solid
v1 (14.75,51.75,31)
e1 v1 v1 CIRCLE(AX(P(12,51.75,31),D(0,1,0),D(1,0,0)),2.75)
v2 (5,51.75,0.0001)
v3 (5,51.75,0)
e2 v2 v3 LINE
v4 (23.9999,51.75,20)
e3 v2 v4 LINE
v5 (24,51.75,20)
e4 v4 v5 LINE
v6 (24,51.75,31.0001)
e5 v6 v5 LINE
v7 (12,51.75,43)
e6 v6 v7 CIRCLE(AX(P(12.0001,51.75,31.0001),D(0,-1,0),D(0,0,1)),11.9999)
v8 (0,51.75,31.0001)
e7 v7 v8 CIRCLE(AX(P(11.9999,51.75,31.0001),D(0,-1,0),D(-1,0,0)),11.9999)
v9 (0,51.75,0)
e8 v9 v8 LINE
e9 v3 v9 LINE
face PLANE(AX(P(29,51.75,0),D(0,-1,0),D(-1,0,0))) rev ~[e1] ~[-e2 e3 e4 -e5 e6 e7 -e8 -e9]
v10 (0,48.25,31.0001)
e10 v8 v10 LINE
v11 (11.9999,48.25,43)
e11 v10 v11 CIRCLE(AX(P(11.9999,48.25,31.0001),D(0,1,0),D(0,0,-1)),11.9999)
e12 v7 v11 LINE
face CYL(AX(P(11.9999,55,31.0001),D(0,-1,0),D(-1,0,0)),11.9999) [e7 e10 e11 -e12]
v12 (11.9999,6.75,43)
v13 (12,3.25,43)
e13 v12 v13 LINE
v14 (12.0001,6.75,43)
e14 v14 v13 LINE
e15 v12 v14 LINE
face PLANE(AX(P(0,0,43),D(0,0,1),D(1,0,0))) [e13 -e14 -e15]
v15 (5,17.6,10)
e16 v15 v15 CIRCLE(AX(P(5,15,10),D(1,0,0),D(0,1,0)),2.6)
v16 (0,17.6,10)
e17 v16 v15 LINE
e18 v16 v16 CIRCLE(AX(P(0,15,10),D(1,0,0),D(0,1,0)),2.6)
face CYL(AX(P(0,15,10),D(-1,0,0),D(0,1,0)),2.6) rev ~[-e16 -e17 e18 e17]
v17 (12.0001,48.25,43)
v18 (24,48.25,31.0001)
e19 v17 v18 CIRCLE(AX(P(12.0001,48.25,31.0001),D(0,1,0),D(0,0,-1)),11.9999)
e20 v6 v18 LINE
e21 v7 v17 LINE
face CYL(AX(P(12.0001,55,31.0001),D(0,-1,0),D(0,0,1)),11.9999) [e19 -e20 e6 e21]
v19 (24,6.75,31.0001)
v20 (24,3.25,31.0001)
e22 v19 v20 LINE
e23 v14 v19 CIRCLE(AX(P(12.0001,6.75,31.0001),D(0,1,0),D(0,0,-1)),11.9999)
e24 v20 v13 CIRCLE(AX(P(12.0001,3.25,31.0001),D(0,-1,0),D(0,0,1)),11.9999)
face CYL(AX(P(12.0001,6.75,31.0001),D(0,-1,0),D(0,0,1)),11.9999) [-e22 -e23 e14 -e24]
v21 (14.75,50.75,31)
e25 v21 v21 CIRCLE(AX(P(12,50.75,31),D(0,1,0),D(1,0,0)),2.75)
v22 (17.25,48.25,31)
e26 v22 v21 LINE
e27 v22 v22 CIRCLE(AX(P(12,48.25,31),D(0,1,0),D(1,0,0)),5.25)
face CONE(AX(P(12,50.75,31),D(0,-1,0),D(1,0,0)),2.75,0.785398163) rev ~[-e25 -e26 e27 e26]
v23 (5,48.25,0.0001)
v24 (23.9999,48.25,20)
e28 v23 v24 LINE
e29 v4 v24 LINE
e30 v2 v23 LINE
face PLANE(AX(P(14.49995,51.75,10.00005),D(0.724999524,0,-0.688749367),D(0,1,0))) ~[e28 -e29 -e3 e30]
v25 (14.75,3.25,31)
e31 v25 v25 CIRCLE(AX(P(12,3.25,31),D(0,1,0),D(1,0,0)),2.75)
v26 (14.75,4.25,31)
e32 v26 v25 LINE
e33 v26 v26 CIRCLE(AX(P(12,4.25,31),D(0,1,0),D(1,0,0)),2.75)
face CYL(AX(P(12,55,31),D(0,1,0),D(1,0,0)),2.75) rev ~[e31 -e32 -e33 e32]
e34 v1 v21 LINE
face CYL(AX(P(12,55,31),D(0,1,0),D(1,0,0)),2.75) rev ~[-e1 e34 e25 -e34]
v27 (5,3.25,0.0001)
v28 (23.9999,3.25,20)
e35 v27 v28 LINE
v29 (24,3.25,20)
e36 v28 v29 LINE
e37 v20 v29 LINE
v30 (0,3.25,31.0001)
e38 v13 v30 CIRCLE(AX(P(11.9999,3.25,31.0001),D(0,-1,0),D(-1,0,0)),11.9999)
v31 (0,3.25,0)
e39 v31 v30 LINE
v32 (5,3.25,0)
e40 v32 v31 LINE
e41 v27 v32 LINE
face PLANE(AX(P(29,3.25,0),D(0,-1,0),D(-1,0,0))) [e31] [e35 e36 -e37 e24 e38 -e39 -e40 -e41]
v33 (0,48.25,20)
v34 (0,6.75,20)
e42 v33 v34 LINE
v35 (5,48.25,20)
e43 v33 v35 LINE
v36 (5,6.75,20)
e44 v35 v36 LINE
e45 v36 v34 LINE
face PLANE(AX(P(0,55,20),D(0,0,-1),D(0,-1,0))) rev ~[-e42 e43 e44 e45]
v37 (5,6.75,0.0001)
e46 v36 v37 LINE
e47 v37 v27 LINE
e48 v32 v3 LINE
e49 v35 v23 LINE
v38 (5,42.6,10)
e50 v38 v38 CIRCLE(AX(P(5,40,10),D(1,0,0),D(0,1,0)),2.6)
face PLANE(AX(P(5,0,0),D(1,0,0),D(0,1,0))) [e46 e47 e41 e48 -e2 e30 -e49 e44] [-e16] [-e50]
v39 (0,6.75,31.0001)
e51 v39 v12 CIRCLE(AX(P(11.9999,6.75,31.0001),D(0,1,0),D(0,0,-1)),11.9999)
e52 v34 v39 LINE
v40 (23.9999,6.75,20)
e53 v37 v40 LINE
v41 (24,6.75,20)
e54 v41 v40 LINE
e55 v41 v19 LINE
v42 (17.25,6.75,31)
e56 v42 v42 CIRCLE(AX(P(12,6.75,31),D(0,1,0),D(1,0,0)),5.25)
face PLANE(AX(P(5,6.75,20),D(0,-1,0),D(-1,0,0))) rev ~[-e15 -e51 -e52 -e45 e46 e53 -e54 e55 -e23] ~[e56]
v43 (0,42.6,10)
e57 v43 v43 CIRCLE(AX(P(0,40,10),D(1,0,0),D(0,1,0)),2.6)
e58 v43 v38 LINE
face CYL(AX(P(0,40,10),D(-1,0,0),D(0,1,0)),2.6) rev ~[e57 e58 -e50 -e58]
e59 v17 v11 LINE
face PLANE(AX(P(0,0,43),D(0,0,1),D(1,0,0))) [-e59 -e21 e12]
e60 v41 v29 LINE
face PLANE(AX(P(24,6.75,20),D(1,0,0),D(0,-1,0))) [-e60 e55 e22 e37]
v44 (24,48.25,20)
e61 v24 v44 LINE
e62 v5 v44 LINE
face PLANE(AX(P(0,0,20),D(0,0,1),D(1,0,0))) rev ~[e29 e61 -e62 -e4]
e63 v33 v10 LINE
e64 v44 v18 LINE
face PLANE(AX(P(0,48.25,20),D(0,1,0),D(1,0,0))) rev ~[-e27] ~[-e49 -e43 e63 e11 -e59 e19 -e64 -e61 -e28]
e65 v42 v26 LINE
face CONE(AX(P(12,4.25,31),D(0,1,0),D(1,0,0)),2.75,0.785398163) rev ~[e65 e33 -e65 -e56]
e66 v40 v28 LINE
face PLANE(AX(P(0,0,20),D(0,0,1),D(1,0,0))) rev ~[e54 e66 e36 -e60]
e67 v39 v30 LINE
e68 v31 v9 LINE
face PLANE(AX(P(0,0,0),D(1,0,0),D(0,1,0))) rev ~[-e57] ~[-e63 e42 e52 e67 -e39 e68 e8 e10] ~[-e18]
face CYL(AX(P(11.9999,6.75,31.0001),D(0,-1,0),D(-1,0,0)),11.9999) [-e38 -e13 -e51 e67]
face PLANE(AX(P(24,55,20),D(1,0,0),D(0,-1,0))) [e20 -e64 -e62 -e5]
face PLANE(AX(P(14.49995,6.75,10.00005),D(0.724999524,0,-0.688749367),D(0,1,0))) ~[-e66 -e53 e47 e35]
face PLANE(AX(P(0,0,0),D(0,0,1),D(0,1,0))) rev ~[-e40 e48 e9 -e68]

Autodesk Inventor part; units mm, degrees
ref_plane "YZ Plane" through (0, 0, 0) normal (1, 0, 0) x (0, 1, 0)
ref_plane "XZ Plane" through (0, 0, 0) normal (0, 1, 0) x (-1, 0, 0)
ref_plane "XY Plane" through (0, 0, 0) normal (0, 0, 1) x (1, 0, 0)
sketch "Sketch1" plane through (0, 0, 0) normal (1, 0, 0) x (0, 1, 0)
  line L0 (0, 0) -> (55, 0)
  line L1 (55, 0) -> (55, 20)
  line L2 (55, 20) -> (0, 20)
  line L3 (0, 20) -> (0, 0)
  line L4 (55, 10) -> (0, 10) construction
  circle A0 centre (40, 10) radius 2.6
  circle A1 centre (15, 10) radius 2.6
  dimension "d0" = 55
  dimension "d1" = 20
  dimension "d2" = 5.2
  dimension "d3" = 5.2
  dimension "d4" = 15
  dimension "d5" = 15
extrude "Extrusion1" add sketch "Sketch1" along normal blind 5
sketch "Sketch2" plane through (0, 0, 20) normal (0, 0, 1) x (1, 0, 0)
  line L0 (0, 48.25) -> (29, 48.25)
  line L1 (29, 48.25) -> (29, 55)
  line L2 (29, 55) -> (0, 55)
  line L3 (0, 55) -> (0, 48.25)
  line L4 (0, 0) -> (29, 0)
  line L5 (29, 0) -> (29, 6.75)
  line L6 (29, 6.75) -> (0, 6.75)
  line L7 (0, 6.75) -> (0, 0)
  line L8 (0, 55) -> (5, 55) projected
  line L9 (0, 0) -> (0, 55) projected
  line L10 (0, 55) -> (0, 0) projected
  line L11 (0, 0) -> (5, 0) projected
  line L12 (5, 55) -> (5, 0) projected
  line L13 (0, 55) -> (5, 55) projected
  line L14 (29, 55) -> (24, 55)
  line L15 (24, 55) -> (24, 0)
  line L16 (24, 0) -> (29, 0)
  line L17 (29, 0) -> (29, 55)
  point P0 (5, 48.25)
  point P1 (5, 6.75)
  point P2 (24, 6.75)
  point P3 (24, 48.25)
  dimension "d8" = 29
  dimension "d9" = 29
  dimension "d12" = 6.75
  dimension "d13" = 41.5
  dimension "d33" = 5
extrude "Extrusion2" add sketch "Sketch2" along normal blind 23 contours L3 L2 L12 L0 | L12 L2 L15 L0 | L6 L12 L4 L7 | L6 L15 L4 L12
fillet "Fillet1" radius 12 4 edges at (24, 51.625, 43) (0, 51.625, 43) (24, 3.375, 43) (0, 3.375, 43)
sketch "Sketch3" plane through (0, 55, 0) normal (0, 1, 0) x (1, 0, 0)
  circle A0 centre (12, -31) radius 2.75
  arc A1 (0, -31) -> (24, -31) centre (12, -31) ccw projected
  point P0 (0, 0)
  dimension "d17" = 5.5
extrude "Extrusion3" cut sketch "Sketch3" against normal through all
sketch "Sketch4" plane through (0, 0, 0) normal (0, 0, -1) x (-1, 0, 0)
  line L0 (0, 55) -> (-5, 55) projected
  line L1 (0, 55) -> (-29, 55)
  line L2 (-29, 55) -> (-29, 51.75)
  line L3 (-29, 51.75) -> (0, 51.75)
  line L4 (0, 51.75) -> (0, 55)
  line L5 (0, 6.75) -> (0, 0) projected
  line L6 (-29, 0) -> (-29, 6.75) projected
  line L7 (0, 0) -> (-29, 0)
  line L8 (-29, 0) -> (-29, 3.25)
  line L9 (-29, 3.25) -> (0, 3.25)
  line L10 (0, 3.25) -> (0, 0)
  dimension "d26" = 3.25
  dimension "d27" = 3.25
extrude "Extrusion4" cut sketch "Sketch4" against normal through all
chamfer "Chamfer3" distance 2.5 angle 45 2 edges at (9.25, 48.25, 31) (9.25, 6.75, 31)
chamfer "Chamfer4" distance 20 distance2 19 1 edges at (5, 50, 20) measured on face at (5, 23.6407, 2.523)
chamfer "Chamfer5" distance 20 distance2 19 1 edges at (5, 5, 20) measured on face at (5, 22.474, 2.523)
equation "\"d3\" = d2"
equation "\"d5\" = d4"
equation "\"d9\" = d8"
properties part number "Y Axis Drag Chain Mount Bolted"
